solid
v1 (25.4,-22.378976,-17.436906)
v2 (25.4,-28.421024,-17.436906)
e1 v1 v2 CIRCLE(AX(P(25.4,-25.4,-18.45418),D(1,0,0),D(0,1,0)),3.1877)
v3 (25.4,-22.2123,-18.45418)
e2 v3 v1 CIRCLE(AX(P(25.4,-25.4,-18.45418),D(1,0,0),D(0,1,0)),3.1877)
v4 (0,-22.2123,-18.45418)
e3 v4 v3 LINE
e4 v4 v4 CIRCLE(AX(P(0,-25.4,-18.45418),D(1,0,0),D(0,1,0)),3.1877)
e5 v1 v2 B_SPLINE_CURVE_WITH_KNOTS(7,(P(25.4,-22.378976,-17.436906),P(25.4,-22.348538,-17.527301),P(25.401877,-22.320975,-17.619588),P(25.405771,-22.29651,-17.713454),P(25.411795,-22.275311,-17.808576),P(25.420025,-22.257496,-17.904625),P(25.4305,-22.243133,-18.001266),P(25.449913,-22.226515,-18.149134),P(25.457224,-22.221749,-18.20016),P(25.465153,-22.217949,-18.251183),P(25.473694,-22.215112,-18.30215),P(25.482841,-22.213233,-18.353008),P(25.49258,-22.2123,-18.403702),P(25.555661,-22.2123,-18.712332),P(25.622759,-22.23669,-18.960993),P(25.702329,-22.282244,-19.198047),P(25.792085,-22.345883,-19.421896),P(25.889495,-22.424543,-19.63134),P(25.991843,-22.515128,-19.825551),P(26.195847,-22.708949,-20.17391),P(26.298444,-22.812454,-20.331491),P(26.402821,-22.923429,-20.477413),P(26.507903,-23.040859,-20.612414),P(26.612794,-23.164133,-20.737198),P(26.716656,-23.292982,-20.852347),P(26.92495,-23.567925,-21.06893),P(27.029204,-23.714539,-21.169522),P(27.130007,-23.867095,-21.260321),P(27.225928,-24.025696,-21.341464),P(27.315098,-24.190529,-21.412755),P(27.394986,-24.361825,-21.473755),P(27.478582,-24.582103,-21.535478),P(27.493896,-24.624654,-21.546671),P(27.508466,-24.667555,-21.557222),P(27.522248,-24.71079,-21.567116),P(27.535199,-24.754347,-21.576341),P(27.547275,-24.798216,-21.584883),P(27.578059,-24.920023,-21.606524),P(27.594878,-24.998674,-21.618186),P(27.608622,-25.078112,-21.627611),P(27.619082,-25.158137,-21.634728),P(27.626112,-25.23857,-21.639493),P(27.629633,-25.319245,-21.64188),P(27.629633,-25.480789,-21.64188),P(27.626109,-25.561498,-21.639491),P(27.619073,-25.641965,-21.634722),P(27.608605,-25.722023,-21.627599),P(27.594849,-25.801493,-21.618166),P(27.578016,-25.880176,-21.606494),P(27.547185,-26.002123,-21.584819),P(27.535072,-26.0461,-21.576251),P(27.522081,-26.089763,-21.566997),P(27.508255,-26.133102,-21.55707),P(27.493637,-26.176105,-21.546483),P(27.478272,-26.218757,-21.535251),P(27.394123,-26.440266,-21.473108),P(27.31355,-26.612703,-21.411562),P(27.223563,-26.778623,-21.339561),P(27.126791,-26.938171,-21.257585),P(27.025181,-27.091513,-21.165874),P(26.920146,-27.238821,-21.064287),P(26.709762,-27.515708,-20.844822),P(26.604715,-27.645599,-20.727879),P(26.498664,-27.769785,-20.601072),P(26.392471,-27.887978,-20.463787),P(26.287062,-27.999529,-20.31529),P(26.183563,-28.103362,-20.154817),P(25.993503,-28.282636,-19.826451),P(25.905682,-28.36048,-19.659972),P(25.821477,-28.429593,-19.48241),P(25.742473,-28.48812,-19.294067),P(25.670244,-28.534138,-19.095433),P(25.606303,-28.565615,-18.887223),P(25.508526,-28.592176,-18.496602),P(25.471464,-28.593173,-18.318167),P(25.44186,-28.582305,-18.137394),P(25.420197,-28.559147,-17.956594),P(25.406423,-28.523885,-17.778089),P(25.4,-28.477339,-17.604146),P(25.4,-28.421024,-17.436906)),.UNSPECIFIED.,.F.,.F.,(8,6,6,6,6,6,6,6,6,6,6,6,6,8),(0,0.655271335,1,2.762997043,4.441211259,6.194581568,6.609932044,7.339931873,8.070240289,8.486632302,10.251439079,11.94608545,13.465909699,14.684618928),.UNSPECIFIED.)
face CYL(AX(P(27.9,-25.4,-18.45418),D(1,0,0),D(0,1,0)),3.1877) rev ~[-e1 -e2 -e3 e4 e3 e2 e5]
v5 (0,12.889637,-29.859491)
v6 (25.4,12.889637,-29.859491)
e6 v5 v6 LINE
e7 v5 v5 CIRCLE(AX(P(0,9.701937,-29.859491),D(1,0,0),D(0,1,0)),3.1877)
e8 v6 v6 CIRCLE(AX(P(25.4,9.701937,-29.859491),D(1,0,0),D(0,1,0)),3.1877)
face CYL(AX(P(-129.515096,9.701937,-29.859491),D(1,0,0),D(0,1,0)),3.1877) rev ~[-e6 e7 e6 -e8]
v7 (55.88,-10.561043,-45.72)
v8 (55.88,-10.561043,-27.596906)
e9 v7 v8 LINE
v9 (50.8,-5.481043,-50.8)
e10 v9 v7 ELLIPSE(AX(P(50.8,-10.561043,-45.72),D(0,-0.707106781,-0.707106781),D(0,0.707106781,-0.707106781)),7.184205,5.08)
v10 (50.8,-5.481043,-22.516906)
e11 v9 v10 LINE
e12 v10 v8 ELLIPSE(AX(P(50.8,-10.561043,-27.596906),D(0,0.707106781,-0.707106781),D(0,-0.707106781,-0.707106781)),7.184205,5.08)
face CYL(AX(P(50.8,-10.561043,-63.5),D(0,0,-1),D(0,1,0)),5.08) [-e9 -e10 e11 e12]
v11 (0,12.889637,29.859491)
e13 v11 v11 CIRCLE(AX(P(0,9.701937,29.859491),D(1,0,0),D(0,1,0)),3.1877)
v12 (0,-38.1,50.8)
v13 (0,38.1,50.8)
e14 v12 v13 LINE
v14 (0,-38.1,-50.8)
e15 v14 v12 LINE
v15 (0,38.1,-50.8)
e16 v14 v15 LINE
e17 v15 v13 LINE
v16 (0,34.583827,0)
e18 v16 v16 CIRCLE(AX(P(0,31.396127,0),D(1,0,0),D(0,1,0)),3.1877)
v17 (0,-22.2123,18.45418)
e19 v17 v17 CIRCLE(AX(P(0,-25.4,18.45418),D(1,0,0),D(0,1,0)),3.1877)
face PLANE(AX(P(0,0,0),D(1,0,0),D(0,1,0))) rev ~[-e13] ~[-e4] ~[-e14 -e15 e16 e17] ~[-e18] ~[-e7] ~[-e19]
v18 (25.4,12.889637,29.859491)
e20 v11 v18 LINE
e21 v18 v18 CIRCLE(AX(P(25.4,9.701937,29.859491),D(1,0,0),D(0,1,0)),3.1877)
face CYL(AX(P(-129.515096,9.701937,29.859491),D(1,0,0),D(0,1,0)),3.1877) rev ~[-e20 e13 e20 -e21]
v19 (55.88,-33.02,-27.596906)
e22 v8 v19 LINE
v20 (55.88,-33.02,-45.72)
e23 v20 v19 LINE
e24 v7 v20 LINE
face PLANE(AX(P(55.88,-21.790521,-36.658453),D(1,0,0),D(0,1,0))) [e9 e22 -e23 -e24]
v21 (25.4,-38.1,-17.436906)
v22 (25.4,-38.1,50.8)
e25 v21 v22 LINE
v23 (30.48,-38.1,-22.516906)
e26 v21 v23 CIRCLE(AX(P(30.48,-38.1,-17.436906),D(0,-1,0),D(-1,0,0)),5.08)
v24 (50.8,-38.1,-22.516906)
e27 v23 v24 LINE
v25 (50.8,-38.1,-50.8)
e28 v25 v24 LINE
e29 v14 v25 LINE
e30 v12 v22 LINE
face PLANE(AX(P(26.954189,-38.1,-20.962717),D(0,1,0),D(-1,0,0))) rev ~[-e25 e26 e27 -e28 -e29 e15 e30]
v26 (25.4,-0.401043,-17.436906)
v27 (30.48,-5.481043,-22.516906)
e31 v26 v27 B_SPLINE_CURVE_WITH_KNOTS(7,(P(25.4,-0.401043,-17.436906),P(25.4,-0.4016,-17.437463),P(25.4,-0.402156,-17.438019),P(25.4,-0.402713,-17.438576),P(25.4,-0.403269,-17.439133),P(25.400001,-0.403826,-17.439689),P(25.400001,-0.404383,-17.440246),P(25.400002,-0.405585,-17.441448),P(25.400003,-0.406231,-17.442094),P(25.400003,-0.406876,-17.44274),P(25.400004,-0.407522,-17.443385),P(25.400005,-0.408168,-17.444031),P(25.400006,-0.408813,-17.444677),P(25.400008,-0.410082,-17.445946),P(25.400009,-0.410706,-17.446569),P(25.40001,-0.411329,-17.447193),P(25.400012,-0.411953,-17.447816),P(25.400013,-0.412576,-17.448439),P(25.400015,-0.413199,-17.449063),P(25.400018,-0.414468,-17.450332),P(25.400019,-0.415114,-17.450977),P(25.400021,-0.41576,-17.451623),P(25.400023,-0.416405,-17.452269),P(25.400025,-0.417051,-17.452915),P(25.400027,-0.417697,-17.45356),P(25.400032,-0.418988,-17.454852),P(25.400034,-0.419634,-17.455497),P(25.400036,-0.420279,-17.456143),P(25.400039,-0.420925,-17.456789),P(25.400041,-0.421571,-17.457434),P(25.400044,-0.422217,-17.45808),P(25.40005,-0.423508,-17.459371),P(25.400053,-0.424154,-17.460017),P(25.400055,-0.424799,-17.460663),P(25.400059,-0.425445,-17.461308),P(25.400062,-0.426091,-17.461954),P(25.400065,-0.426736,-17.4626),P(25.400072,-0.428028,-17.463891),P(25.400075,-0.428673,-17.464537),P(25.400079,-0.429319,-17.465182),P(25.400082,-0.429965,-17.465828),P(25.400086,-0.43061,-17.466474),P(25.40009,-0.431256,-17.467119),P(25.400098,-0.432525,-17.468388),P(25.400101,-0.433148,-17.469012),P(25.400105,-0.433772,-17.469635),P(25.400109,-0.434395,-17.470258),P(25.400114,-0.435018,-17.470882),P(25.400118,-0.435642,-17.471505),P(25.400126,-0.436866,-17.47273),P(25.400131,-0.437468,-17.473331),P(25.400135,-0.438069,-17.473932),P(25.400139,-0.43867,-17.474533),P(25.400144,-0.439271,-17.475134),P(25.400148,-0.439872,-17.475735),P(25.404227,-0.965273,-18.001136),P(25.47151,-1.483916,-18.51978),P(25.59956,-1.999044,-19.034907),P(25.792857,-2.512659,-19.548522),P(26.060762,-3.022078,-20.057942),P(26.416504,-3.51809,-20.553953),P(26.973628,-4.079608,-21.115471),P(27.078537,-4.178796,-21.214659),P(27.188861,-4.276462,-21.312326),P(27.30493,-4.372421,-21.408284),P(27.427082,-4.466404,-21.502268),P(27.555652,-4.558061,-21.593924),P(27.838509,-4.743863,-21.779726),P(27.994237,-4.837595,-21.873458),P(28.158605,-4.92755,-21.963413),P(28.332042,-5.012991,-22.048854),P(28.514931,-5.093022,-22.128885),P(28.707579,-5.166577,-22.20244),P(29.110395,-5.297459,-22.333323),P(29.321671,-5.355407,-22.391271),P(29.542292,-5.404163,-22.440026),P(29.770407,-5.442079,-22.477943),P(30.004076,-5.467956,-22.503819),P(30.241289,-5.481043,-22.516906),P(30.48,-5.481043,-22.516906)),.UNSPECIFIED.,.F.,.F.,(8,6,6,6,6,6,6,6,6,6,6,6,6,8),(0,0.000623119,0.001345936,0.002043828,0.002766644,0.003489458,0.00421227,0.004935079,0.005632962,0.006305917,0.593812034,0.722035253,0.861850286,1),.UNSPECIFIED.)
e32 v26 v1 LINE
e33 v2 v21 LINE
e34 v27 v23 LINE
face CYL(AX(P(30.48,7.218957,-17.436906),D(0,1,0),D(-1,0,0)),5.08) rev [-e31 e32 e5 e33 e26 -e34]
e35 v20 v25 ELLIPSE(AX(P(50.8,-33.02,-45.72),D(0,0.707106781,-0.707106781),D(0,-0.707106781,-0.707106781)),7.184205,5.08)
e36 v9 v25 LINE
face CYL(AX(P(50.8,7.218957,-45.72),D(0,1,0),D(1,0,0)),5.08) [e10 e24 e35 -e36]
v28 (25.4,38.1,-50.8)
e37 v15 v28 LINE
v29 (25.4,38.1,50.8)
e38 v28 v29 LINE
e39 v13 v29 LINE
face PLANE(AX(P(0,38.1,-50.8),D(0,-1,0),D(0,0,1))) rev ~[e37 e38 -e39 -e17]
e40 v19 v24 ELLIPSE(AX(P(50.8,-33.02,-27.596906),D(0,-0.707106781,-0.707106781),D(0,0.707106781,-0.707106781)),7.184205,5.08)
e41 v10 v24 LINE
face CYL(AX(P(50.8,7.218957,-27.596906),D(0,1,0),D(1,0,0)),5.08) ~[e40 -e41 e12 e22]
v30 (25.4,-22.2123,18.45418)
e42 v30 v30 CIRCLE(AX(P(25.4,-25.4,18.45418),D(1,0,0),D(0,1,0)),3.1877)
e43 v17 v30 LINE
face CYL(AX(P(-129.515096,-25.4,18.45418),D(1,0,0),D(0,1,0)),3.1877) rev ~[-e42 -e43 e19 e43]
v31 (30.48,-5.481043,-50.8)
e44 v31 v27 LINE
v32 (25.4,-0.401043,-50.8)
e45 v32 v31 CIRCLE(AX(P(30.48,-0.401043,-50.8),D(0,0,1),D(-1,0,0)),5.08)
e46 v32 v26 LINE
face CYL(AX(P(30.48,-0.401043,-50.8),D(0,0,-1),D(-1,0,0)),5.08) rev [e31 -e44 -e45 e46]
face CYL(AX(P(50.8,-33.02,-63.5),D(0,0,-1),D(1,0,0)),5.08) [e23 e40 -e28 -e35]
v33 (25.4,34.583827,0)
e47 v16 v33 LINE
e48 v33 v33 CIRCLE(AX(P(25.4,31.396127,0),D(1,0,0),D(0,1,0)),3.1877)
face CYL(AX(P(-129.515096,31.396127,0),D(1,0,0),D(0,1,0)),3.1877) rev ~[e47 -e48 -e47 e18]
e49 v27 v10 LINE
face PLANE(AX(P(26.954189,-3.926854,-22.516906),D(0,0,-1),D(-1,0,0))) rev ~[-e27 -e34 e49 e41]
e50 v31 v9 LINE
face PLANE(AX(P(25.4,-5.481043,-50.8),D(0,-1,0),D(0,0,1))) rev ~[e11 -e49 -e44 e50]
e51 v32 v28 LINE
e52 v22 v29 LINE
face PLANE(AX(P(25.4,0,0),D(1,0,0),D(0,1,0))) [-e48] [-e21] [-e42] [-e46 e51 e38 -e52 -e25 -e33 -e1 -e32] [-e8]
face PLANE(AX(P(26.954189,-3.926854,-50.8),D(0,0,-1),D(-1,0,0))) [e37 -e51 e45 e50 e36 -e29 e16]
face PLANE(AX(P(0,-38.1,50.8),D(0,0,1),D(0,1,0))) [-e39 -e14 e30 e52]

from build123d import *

# Parameters (mm, degrees)
F0_W         = 76.2
F0_H         = 101.6
F1_DEPTH     = 25.4
F3_D         = 6.3754
F4_W         = 32.6189571008
F4_H         = 28.2830937386
F5_DEPTH     = 30.48
F6_T1_DEPTH  = 28.2830937386
F6_T6_DEPTH  = 32.6189571008
F6_S7_R      = 3.1877
F6_T8_DEPTH  = 18
F6_T13_DEPTH = 40.9830937386
F6_T17_DEPTH = 45.3189571008
F6_T20_DEPTH = 53.6830937386
F6_T22_DEPTH = 58.0189571008


# Not quite as in the source:
# - a fillet or chamfer that OpenCascade refuses, or shapes differently, is made with other operations: its cross-section is extruded or revolved along the edge and cut away or added


with BuildPart() as f1:
    # F0 (on Right) → F1 (new body)
    with BuildSketch(Plane.YZ):
        Rectangle(F0_W, F0_H)
    extrude(amount=F1_DEPTH)

    # F3 (through all)
    with Locations(Plane(origin=(0, 0, 0), x_dir=(0, -1, 0), z_dir=(-1, 0, 0))):
        with Locations((-31.3961266285, 0), (-9.7019366858, 29.8594908165), (25.4, 18.4541802113), (25.4, -18.4541802113), (-9.7019366858, -29.8594908165)):
            Hole(F3_D / 2)

    # F4 (on face) → F5 (join)
    with BuildSketch(Plane.YZ.offset(25.4)):
        with Locations((-21.7905214496, -36.6584531307)):
            Rectangle(F4_W, F4_H)
    extrude(amount=F5_DEPTH)

    # F6: fillet of radius 5.08 on 6 edges, made by hand

    # F6_s2 → F6_t1 (join)
    with BuildSketch(Plane.XY.offset(-50.8)):
        with BuildLine():
            ThreePointArc((25.4, -0.4010428992), (26.8878975516, -3.9931453476), (30.48, -5.4810428992))
            Line((30.48, -5.4810428992), (25.4, -5.4810428992))
            Line((25.4, -5.4810428992), (25.4, -0.4010428992))
        make_face()
    extrude(amount=F6_T1_DEPTH)


with BuildPart() as f6_tool4:
    # F6_s5 → F6_t6 (new body)
    with BuildSketch(Plane.XZ.offset(5.4810428992)):
        with BuildLine():
            ThreePointArc((25.4, -17.4369062614), (26.8878975516, -21.0290087099), (30.48, -22.5169062614))
            Line((30.48, -22.5169062614), (25.4, -22.5169062614))
            Line((25.4, -22.5169062614), (25.4, -17.4369062614))
        make_face()
    extrude(amount=F6_T6_DEPTH)

    # F6_s7 → F6_t8 (cut, symmetric)
    with BuildSketch(Plane.YZ.offset(27.9)):
        with Locations((-25.4, -18.4541802113)):
            Circle(F6_S7_R)
    extrude(amount=F6_T8_DEPTH, both=True, mode=Mode.SUBTRACT)


with BuildPart() as f1_1:
    add(f1.part)

    # F6_t3: union F6_tool4
    add(f6_tool4.part)


with BuildPart() as f6_tool11:
    # F6_s12 → F6_t13 (new body)
    with BuildSketch(Plane.XY.offset(-50.8)):
        with BuildLine():
            ThreePointArc((25.4, -0.4010428992), (26.8878975516, -3.9931453476), (30.48, -5.4810428992))
            Line((30.48, -5.4810428992), (25.4, -5.4810428992))
            Line((25.4, -5.4810428992), (25.4, -0.4010428992))
        make_face()
    extrude(amount=F6_T13_DEPTH)

    split(bisect_by=Plane.XY.offset(-22.5169062614), keep=Keep.TOP)


with BuildPart() as f6_tool15:
    # F6_s16 → F6_t17 (new body)
    with BuildSketch(Plane.XZ.offset(-7.2189571008)):
        with BuildLine():
            ThreePointArc((25.4, -17.4369062614), (26.8878975516, -21.0290087099), (30.48, -22.5169062614))
            Line((30.48, -22.5169062614), (25.4, -22.5169062614))
            Line((25.4, -22.5169062614), (25.4, -17.4369062614))
        make_face()
    extrude(amount=F6_T17_DEPTH)

    split(bisect_by=Plane.XZ.offset(5.4810428992), keep=Keep.BOTTOM)


with BuildPart() as f6_tool11_1:
    add(f6_tool11.part)

    # F6_t19: intersect F6_tool15
    add(f6_tool15.part, mode=Mode.INTERSECT)


with BuildPart() as f1_2:
    add(f1_1.part)

    # F6_t9: union F6_tool11
    add(f6_tool11_1.part)

    # F6_s21 → F6_t20 (cut)
    with BuildSketch(Plane.XY.offset(-63.5)):
        with BuildLine():
            ThreePointArc((50.8, -5.4810428992), (54.3921024484, -6.9689404508), (55.88, -10.5610428992))
            Line((55.88, -10.5610428992), (55.88, -5.4810428992))
            Line((55.88, -5.4810428992), (50.8, -5.4810428992))
        make_face()
        with BuildLine():
            ThreePointArc((55.88, -33.02), (54.3921024484, -36.6121024484), (50.8, -38.1))
            Line((50.8, -38.1), (55.88, -38.1))
            Line((55.88, -38.1), (55.88, -33.02))
        make_face()
    extrude(amount=F6_T20_DEPTH, mode=Mode.SUBTRACT)

    # F6_s23 → F6_t22 (cut)
    with BuildSketch(Plane.XZ.offset(-7.2189571008)):
        with BuildLine():
            ThreePointArc((55.88, -45.72), (54.3921024484, -49.3121024484), (50.8, -50.8))
            Line((50.8, -50.8), (55.88, -50.8))
            Line((55.88, -50.8), (55.88, -45.72))
        make_face()
        with BuildLine():
            ThreePointArc((55.88, -27.5969062614), (54.3921024484, -24.004803813), (50.8, -22.5169062614))
            Line((50.8, -22.5169062614), (55.88, -22.5169062614))
            Line((55.88, -22.5169062614), (55.88, -27.5969062614))
        make_face()
    extrude(amount=F6_T22_DEPTH, mode=Mode.SUBTRACT)


solid = f1_2.part
